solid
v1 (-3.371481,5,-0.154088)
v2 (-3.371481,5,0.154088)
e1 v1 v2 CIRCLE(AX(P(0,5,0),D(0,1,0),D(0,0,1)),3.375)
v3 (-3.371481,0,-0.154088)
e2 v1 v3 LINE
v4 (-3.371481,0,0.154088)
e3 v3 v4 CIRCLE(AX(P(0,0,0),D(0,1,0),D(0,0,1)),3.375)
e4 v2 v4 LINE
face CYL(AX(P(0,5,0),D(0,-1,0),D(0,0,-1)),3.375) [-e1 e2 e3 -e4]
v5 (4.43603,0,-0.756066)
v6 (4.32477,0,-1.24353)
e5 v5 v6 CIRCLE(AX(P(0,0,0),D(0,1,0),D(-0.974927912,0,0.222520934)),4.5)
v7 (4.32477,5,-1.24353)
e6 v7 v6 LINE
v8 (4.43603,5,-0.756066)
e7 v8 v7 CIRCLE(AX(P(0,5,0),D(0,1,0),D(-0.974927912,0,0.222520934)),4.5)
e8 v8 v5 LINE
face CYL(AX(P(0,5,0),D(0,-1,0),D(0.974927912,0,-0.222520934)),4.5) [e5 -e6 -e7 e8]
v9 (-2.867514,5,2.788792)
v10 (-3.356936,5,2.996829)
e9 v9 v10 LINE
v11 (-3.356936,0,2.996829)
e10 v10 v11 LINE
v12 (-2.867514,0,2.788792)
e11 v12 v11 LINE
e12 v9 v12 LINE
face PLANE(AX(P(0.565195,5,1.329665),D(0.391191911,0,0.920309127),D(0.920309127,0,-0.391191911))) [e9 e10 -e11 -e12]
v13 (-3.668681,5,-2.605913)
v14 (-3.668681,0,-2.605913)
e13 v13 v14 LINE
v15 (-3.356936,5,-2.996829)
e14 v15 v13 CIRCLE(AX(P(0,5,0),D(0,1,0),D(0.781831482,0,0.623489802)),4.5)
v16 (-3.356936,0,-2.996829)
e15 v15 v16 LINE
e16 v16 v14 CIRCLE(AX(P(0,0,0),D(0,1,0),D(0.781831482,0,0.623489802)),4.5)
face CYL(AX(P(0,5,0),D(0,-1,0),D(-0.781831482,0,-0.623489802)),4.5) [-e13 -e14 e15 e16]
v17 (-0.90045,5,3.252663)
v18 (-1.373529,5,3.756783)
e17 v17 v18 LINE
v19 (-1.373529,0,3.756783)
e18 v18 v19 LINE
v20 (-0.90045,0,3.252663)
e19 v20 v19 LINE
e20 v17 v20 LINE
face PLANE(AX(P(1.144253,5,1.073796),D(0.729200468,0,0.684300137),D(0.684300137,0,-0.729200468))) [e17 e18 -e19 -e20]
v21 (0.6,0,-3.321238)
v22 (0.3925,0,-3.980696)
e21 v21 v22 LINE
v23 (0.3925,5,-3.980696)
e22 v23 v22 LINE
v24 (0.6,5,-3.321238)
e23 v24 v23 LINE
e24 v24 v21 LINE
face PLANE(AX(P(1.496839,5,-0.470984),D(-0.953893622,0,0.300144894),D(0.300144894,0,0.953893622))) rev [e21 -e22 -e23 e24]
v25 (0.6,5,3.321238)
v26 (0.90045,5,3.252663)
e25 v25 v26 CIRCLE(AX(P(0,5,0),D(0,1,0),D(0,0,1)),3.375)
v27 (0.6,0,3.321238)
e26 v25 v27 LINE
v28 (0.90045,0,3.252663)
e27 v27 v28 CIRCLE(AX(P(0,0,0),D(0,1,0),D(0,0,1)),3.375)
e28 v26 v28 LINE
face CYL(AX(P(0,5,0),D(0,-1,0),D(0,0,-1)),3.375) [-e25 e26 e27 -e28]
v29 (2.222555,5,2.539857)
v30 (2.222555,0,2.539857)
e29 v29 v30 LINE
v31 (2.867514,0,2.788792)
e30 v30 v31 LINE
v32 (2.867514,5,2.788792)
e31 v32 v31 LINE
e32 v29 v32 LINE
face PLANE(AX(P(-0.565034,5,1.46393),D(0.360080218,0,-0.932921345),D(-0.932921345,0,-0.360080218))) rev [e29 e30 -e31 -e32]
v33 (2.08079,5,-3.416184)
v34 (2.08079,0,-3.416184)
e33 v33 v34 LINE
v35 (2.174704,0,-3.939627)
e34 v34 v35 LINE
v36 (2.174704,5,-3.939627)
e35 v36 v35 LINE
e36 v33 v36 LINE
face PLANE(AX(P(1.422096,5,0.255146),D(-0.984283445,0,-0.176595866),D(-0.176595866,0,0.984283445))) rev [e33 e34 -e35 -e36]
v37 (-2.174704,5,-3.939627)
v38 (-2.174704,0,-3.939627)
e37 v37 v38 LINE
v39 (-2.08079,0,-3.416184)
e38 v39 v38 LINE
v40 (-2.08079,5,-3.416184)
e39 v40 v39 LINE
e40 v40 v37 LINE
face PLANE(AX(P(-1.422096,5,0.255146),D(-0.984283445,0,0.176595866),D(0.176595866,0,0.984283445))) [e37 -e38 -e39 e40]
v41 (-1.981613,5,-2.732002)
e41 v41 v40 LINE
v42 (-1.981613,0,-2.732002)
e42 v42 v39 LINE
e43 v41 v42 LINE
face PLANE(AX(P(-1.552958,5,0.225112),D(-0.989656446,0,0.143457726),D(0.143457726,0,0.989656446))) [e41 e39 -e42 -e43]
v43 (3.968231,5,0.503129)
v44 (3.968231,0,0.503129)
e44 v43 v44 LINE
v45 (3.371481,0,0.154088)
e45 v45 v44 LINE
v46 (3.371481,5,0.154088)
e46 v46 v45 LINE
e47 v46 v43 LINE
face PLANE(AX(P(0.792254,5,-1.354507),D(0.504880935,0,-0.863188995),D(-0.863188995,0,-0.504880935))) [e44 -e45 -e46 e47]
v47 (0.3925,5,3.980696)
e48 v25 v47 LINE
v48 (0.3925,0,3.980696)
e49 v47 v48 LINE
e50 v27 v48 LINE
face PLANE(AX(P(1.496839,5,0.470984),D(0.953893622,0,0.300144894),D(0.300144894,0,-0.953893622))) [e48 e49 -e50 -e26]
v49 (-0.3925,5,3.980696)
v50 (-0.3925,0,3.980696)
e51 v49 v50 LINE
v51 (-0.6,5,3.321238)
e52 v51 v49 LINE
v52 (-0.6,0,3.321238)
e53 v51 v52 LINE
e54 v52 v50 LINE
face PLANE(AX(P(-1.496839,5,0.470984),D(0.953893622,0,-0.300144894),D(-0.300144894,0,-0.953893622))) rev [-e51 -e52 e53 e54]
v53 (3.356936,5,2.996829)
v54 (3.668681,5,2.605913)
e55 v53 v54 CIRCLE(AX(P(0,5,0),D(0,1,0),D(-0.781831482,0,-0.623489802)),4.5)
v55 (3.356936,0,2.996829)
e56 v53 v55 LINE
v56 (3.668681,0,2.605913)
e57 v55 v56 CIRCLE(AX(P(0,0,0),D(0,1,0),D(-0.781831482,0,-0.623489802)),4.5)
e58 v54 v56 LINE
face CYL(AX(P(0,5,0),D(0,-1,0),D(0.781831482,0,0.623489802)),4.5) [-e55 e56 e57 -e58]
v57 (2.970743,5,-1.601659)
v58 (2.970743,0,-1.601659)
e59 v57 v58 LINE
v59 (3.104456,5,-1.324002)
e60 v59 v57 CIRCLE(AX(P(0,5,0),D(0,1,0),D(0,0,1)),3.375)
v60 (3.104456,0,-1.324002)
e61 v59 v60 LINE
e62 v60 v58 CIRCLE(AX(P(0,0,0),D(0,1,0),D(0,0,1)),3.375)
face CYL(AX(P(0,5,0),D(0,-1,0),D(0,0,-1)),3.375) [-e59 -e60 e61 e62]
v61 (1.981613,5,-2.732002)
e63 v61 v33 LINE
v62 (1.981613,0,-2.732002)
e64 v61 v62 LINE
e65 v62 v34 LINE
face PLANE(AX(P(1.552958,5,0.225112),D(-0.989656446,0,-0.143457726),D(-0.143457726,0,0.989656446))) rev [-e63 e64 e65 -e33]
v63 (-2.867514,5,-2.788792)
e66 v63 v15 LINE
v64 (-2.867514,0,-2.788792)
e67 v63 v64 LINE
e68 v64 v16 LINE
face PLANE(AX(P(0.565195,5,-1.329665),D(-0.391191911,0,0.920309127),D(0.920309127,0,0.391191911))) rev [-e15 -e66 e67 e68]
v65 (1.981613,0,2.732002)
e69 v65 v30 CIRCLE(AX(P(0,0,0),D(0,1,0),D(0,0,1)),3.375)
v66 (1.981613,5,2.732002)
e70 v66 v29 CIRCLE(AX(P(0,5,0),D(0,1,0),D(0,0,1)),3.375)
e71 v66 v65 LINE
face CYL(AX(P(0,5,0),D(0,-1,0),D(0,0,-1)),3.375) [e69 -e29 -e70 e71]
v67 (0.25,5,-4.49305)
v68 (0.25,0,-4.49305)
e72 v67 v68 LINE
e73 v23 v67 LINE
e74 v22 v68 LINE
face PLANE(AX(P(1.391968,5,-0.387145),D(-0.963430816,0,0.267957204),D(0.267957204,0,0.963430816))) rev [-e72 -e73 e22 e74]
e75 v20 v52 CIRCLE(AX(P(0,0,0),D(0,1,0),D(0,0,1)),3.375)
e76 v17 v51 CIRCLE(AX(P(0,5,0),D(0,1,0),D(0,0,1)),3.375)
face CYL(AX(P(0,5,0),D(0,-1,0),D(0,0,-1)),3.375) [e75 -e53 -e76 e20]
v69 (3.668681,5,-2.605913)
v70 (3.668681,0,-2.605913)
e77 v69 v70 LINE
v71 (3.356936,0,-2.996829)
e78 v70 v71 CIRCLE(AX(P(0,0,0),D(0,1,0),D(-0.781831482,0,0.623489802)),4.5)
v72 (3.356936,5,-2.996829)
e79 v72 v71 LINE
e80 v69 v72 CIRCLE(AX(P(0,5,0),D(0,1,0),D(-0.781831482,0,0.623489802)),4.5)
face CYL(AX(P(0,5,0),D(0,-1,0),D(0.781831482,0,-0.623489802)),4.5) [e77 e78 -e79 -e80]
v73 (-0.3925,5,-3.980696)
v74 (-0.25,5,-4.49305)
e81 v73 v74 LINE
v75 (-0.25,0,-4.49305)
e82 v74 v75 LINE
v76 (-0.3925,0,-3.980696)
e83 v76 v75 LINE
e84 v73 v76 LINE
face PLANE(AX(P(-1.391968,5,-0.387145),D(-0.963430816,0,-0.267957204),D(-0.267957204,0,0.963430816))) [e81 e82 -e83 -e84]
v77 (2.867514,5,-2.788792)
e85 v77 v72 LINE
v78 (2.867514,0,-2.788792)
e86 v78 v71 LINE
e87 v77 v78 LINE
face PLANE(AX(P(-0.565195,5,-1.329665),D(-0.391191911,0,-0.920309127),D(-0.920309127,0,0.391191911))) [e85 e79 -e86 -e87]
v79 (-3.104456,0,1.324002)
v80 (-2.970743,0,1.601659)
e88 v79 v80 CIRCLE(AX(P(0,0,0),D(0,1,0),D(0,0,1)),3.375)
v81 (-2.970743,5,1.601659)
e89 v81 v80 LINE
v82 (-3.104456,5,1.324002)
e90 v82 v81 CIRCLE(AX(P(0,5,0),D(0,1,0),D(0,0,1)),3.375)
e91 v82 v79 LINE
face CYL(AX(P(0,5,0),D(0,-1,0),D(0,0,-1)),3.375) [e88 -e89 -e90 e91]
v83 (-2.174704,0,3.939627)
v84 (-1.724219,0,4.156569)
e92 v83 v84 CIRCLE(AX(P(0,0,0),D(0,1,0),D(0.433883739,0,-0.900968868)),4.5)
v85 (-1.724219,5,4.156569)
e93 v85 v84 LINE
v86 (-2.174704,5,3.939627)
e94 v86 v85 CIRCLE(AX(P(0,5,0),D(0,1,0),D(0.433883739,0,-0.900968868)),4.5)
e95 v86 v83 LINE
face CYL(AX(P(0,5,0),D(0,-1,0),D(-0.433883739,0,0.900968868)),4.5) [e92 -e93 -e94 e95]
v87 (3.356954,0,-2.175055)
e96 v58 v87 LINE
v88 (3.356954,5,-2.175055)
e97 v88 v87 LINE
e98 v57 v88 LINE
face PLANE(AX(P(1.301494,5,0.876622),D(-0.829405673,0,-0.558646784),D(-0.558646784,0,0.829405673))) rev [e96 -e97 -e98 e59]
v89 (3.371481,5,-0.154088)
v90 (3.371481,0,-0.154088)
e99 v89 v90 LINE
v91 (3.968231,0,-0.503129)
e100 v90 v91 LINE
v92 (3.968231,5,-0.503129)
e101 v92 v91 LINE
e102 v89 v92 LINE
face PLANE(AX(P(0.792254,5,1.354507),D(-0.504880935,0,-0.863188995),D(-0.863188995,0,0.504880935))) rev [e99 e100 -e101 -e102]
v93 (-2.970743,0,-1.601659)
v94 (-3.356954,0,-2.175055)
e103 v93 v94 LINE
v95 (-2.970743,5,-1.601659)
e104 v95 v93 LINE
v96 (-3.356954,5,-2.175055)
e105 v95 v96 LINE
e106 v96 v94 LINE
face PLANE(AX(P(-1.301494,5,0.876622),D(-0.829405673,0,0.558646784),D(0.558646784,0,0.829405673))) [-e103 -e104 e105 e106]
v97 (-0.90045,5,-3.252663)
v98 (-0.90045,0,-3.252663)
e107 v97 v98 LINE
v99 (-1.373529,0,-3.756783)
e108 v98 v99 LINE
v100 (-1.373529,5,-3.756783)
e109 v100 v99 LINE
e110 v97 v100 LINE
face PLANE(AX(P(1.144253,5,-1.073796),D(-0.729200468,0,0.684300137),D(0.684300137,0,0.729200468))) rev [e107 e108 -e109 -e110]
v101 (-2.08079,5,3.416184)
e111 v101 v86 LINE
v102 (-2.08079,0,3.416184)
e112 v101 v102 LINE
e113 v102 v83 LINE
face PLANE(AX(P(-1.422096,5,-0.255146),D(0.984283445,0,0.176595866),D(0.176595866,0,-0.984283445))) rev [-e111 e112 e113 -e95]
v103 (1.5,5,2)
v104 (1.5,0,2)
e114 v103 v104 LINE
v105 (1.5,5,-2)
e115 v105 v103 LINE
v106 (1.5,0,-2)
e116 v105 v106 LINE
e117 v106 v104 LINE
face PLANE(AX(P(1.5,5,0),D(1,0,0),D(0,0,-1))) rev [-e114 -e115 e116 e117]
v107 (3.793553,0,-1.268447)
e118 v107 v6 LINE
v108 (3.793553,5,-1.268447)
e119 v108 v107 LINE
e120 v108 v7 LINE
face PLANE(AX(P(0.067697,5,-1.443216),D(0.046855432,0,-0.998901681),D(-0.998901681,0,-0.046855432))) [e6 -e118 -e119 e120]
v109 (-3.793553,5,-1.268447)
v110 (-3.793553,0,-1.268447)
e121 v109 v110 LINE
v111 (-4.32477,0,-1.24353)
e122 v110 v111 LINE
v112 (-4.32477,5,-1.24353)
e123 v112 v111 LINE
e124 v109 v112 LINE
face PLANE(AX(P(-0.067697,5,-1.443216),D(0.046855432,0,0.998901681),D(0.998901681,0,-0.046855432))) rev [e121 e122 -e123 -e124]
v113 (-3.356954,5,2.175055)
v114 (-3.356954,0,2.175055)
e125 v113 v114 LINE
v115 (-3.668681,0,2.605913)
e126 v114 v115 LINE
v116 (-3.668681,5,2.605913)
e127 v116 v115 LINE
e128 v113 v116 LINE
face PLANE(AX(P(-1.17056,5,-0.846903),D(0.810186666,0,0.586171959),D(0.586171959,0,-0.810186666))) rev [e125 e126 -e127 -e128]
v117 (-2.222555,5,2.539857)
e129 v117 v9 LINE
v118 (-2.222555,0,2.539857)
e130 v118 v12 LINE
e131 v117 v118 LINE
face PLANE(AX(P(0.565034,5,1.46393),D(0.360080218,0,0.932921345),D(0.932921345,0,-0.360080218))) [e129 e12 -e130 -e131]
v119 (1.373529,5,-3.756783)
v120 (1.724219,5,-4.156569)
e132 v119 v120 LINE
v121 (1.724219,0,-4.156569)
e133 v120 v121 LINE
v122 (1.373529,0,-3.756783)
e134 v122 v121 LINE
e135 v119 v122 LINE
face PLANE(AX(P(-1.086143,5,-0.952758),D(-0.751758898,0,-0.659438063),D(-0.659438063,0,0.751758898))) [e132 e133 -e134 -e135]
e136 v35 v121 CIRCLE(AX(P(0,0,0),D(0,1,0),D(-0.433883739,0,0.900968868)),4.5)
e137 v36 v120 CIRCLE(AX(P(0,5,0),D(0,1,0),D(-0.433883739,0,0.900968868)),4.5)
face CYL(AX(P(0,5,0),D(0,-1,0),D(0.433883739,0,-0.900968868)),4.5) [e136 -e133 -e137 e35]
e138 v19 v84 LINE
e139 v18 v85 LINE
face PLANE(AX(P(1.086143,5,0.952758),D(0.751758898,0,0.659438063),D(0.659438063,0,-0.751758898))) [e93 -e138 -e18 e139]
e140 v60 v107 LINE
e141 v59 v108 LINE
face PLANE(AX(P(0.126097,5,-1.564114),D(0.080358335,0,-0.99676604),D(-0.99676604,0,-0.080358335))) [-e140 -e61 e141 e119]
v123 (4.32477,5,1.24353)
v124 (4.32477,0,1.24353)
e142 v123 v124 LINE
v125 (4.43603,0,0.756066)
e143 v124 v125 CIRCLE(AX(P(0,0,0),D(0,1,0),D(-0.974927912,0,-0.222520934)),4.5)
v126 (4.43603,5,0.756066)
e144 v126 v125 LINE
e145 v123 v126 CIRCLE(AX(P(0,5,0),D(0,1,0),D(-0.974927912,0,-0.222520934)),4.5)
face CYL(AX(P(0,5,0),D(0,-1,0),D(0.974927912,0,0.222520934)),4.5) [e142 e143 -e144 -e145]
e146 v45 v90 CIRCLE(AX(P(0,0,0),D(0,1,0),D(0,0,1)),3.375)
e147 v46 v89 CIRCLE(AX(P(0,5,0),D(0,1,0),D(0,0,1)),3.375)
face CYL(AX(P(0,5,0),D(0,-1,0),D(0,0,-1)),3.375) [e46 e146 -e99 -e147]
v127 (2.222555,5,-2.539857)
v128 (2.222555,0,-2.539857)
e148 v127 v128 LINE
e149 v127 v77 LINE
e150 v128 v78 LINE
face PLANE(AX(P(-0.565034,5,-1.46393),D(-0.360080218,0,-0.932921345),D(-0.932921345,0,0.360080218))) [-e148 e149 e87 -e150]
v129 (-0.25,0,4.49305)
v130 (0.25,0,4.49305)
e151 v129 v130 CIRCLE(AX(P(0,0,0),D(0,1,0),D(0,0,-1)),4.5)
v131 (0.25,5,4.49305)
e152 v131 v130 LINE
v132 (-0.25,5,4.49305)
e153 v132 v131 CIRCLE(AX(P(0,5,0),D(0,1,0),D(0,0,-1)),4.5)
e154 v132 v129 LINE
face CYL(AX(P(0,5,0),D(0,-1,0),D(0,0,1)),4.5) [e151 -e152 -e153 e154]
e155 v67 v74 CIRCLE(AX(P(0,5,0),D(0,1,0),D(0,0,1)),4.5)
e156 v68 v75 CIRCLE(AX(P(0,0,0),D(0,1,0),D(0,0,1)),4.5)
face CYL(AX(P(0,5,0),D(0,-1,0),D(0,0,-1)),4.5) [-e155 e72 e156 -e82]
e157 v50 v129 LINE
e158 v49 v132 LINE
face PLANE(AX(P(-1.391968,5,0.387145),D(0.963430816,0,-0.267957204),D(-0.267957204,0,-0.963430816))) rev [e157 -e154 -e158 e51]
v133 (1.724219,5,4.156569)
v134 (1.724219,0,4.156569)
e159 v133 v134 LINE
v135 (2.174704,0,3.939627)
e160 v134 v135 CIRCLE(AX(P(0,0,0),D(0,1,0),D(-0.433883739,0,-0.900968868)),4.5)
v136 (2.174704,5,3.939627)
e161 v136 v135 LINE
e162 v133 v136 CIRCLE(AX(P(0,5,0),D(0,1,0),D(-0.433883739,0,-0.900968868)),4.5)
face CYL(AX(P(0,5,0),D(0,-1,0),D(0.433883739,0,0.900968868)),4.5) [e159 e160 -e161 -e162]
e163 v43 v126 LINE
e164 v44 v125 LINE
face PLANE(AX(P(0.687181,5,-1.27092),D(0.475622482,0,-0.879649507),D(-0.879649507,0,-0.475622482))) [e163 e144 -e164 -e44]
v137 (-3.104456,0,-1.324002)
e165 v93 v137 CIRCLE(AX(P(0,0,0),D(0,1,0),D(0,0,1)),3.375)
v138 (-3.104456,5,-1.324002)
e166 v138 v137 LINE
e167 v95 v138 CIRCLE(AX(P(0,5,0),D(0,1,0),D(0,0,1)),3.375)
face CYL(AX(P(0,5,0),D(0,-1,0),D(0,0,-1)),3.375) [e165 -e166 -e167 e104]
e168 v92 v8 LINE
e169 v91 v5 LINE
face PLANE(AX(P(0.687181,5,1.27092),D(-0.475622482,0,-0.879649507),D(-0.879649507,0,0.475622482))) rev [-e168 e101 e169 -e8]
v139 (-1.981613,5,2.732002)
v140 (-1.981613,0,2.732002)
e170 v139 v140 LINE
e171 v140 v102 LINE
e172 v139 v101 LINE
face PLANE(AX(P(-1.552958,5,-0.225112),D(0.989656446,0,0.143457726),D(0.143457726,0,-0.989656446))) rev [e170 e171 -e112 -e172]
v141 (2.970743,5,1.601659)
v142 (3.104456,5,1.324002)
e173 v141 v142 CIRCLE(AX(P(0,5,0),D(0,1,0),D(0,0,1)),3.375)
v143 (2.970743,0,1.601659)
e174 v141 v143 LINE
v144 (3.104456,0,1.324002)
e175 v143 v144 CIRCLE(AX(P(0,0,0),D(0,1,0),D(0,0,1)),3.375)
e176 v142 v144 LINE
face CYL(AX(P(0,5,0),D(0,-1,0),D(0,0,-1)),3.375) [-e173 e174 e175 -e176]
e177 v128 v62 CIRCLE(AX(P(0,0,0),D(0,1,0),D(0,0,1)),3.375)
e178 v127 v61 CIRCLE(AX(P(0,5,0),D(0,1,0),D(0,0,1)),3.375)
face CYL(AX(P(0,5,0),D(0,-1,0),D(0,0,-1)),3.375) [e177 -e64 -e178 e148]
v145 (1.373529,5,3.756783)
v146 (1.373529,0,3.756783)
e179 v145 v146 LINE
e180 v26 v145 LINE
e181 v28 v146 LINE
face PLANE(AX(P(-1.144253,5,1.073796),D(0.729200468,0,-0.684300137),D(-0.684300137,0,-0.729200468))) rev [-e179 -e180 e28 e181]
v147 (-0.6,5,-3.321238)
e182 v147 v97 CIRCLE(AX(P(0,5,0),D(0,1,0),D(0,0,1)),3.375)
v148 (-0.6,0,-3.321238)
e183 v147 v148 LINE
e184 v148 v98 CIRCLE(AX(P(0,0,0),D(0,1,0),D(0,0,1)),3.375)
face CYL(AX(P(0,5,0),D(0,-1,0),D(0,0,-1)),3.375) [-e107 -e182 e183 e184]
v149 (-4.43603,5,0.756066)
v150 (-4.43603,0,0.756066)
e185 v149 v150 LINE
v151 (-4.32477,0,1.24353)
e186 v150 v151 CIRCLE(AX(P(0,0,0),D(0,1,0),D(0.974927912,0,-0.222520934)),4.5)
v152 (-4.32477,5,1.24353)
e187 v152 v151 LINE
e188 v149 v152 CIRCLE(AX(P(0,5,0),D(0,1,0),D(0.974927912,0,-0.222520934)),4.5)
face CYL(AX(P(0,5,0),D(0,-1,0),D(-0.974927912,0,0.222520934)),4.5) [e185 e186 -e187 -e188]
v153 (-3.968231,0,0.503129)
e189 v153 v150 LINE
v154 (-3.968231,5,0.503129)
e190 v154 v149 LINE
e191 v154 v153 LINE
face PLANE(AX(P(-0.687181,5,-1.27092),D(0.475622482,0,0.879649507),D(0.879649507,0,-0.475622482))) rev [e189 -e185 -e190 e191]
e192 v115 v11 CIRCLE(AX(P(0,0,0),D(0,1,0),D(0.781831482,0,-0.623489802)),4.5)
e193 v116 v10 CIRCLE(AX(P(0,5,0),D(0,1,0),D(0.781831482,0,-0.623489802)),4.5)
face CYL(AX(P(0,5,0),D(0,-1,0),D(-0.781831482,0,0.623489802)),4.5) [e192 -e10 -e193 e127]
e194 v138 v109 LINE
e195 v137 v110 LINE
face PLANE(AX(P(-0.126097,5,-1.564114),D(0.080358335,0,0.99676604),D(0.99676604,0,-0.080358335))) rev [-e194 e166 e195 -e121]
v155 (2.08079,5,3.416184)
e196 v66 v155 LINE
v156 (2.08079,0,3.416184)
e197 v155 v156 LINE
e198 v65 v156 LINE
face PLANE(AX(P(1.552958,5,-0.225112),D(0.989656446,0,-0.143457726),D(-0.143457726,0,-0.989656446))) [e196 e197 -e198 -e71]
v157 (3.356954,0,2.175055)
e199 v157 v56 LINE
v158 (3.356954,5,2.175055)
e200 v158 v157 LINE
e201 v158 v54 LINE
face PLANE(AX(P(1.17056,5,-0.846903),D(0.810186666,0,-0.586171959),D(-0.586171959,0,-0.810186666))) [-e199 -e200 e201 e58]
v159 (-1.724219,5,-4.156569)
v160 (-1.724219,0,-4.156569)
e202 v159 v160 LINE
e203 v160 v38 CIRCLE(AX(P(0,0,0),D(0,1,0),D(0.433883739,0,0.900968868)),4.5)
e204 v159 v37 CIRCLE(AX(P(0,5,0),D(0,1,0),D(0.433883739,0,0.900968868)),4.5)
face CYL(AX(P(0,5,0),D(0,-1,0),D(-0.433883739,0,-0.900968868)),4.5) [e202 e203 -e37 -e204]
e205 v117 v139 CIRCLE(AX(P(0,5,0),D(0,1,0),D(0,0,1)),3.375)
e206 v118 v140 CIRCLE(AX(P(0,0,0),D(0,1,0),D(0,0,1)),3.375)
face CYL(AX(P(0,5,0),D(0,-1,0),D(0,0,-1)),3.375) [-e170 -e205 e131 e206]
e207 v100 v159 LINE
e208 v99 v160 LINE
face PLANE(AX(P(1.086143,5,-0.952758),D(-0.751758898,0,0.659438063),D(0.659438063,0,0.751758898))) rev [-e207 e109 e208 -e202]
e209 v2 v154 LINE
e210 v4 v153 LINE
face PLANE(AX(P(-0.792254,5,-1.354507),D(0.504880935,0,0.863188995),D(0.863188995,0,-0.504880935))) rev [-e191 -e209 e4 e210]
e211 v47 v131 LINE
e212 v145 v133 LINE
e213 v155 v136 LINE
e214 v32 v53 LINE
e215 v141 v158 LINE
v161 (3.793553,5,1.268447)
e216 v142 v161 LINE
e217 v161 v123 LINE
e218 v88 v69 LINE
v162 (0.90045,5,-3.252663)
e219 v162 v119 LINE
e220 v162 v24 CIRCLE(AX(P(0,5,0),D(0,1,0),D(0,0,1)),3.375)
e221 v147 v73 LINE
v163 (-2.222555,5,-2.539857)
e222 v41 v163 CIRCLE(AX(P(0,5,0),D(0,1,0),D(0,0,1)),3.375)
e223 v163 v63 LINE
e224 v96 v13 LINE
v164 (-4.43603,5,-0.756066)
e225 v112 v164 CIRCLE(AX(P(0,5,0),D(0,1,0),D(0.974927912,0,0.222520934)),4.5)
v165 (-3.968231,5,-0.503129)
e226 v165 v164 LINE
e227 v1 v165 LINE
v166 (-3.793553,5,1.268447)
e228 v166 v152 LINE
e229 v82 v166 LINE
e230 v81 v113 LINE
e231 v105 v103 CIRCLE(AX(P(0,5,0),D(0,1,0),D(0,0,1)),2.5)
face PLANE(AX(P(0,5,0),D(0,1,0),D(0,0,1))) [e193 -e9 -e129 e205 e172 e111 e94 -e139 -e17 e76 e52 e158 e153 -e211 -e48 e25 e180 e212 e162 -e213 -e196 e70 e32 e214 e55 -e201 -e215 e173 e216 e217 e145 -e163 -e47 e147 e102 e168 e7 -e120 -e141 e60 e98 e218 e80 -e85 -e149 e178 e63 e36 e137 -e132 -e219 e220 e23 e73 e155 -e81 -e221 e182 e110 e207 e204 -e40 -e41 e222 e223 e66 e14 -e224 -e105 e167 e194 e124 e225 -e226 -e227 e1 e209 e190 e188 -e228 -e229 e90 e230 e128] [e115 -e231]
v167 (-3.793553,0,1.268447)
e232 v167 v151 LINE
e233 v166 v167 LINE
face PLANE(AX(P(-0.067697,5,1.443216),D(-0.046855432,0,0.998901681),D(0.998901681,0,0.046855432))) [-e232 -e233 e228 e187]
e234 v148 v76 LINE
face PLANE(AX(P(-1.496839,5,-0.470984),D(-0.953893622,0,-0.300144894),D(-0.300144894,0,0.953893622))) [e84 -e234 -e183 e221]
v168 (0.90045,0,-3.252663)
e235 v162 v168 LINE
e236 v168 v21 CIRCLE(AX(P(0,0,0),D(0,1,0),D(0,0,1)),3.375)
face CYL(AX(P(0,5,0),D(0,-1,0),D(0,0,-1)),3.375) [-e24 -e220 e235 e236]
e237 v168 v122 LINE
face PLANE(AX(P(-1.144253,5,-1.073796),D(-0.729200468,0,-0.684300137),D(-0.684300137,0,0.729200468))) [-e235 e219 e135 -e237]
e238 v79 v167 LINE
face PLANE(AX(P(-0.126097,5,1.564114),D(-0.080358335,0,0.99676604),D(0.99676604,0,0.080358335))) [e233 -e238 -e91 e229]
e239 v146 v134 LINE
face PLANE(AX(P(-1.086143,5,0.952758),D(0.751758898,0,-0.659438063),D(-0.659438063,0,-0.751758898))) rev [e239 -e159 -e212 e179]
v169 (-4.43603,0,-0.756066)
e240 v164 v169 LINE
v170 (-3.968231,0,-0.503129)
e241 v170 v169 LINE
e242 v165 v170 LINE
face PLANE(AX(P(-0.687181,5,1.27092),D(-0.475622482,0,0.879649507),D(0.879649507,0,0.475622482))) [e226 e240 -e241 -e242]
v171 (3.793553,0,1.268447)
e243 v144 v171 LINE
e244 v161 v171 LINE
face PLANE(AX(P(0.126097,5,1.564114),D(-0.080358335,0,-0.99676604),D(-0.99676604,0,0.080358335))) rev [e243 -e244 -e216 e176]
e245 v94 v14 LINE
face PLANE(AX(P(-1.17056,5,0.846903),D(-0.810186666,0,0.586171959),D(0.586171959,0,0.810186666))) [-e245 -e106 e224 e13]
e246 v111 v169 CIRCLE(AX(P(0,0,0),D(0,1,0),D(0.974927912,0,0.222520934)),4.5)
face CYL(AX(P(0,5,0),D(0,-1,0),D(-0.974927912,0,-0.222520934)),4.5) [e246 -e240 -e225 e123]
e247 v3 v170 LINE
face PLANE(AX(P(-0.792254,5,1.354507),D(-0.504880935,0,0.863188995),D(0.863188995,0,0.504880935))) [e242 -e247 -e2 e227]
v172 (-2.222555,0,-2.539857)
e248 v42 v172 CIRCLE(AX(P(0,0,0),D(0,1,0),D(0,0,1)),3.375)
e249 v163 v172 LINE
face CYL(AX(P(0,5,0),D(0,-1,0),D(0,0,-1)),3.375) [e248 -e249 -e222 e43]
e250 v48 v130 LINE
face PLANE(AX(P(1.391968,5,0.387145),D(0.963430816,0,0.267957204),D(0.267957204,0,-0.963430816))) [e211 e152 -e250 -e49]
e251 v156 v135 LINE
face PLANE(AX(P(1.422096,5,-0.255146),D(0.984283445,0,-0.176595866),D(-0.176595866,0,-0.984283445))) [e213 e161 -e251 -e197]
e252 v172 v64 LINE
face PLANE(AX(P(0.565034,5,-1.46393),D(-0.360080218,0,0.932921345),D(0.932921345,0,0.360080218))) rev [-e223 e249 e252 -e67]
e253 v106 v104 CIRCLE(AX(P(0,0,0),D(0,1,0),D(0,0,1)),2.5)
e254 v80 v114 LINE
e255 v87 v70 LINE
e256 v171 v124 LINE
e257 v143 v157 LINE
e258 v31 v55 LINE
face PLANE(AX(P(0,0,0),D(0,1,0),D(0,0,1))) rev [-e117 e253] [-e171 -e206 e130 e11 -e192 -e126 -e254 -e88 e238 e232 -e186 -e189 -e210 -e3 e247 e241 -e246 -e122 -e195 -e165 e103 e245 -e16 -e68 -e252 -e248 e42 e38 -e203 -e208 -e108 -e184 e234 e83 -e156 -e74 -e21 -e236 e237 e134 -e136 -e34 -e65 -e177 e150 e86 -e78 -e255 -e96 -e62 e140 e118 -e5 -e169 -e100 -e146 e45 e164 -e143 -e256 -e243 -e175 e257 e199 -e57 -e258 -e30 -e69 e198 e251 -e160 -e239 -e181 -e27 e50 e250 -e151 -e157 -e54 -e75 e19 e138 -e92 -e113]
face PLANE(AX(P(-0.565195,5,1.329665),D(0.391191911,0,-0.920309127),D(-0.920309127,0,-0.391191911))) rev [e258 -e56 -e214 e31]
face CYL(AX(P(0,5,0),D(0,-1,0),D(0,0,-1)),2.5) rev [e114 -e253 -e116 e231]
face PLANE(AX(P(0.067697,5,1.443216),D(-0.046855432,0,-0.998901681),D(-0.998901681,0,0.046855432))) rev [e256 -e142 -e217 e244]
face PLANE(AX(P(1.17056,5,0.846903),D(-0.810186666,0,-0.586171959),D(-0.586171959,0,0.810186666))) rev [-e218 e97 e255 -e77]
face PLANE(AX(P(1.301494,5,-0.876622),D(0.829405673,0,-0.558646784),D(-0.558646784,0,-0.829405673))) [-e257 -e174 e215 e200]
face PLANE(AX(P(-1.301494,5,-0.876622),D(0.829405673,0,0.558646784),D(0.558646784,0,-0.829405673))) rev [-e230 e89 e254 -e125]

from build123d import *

# Parameters (mm, degrees)
BOSS_EXTRUDE1_DEPTH = 5
CIRPATTERN1_DEPTH   = 5


# Read off the part's stored shape, not the designer's step: CirPattern1
with BuildPart() as part:
    # Sketch2 → Boss-Extrude1 (new body)
    with BuildSketch(Plane(origin=(0, 0, 0), x_dir=(1, 0, 0), z_dir=(0, 1, 0))):
        with BuildLine():
            Line((-0.3925, 3.98069639), (-0.6, 3.321238474))
            ThreePointArc((-0.6, 3.321238474), (0, -3.375), (0.6, 3.321238474))
            Line((0.6, 3.321238474), (0.3925, 3.98069639))
            Line((0.3925, 3.98069639), (0.25, 4.493050189))
            ThreePointArc((0.25, 4.493050189), (0, 4.5), (-0.25, 4.493050189))
            Line((-0.25, 4.493050189), (-0.3925, 3.98069639))
        make_face()
        with BuildLine():
            Line((1.5, 2), (1.5, -2))
            ThreePointArc((1.5, -2), (-2.5, 0), (1.5, 2))
        make_face(mode=Mode.SUBTRACT)
    extrude(amount=BOSS_EXTRUDE1_DEPTH)

    # CirPattern1 outline → CirPattern1 (add)
    with BuildSketch(Plane(origin=(0, 0, 0), x_dir=(1, 0, 0), z_dir=(0, 1, 0))):
        with BuildLine():
            Line((1.724219199, 4.156569277), (1.373529153, 3.756782888))
            Line((1.373529153, 3.756782888), (0.900450047, 3.252662711))
            ThreePointArc((0.900450047, 3.252662711), (1.46435762, 3.040769929), (1.981612688, 2.732002224))
            Line((1.981612688, 2.732002224), (2.080789715, 3.416184152))
            Line((2.080789715, 3.416184152), (2.174703633, 3.939627407))
            ThreePointArc((2.174703633, 3.939627407), (1.952476826, 4.054359906), (1.724219199, 4.156569277))
        make_face()
        with BuildLine():
            Line((-2.080789715, 3.416184152), (-1.981612688, 2.732002224))
            ThreePointArc((-1.981612688, 2.732002224), (-1.46435762, 3.040769929), (-0.900450047, 3.252662711))
            Line((-0.900450047, 3.252662711), (-1.373529153, 3.756782888))
            Line((-1.373529153, 3.756782888), (-1.724219199, 4.156569277))
            ThreePointArc((-1.724219199, 4.156569277), (-1.952476826, 4.054359906), (-2.174703633, 3.939627407))
            Line((-2.174703633, 3.939627407), (-2.080789715, 3.416184152))
        make_face()
        with BuildLine():
            Line((-3.356953507, 2.175054747), (-2.970742681, 1.601659428))
            ThreePointArc((-2.970742681, 1.601659428), (-2.638681254, 2.104278081), (-2.222554919, 2.539857207))
            Line((-2.222554919, 2.539857207), (-2.867514013, 2.78879246))
            Line((-2.867514013, 2.78879246), (-3.35693564, 2.996828843))
            ThreePointArc((-3.35693564, 2.996828843), (-3.518241671, 2.805704108), (-3.66868054, 2.605913101))
            Line((-3.66868054, 2.605913101), (-3.356953507, 2.175054747))
        make_face()
        with BuildLine():
            Line((-3.968231487, 0.503129073), (-3.371480652, 0.15408834))
            ThreePointArc((-3.371480652, 0.15408834), (-3.290381704, 0.751008152), (-3.104455531, 1.324001834))
            Line((-3.104455531, 1.324001834), (-3.793552554, 1.268447484))
            Line((-3.793552554, 1.268447484), (-4.324769807, 1.243529702))
            ThreePointArc((-4.324769807, 1.243529702), (-4.387175605, 1.001344203), (-4.436030273, 0.756065746))
            Line((-4.436030273, 0.756065746), (-3.968231487, 0.503129073))
        make_face()
        with BuildLine():
            Line((-3.793552554, -1.268447484), (-3.104455531, -1.324001834))
            ThreePointArc((-3.104455531, -1.324001834), (-3.290381704, -0.751008152), (-3.371480652, -0.15408834))
            Line((-3.371480652, -0.15408834), (-3.968231487, -0.503129073))
            Line((-3.968231487, -0.503129073), (-4.436030273, -0.756065746))
            ThreePointArc((-4.436030273, -0.756065746), (-4.387175605, -1.001344203), (-4.324769807, -1.243529702))
            Line((-4.324769807, -1.243529702), (-3.793552554, -1.268447484))
        make_face()
        with BuildLine():
            Line((-2.867514013, -2.78879246), (-2.222554919, -2.539857207))
            ThreePointArc((-2.222554919, -2.539857207), (-2.638681254, -2.104278081), (-2.970742681, -1.601659428))
            Line((-2.970742681, -1.601659428), (-3.356953507, -2.175054747))
            Line((-3.356953507, -2.175054747), (-3.66868054, -2.605913101))
            ThreePointArc((-3.66868054, -2.605913101), (-3.518241671, -2.805704108), (-3.35693564, -2.996828843))
            Line((-3.35693564, -2.996828843), (-2.867514013, -2.78879246))
        make_face()
        with BuildLine():
            Line((-1.373529153, -3.756782888), (-0.900450047, -3.252662711))
            ThreePointArc((-0.900450047, -3.252662711), (-1.46435762, -3.040769929), (-1.981612688, -2.732002224))
            Line((-1.981612688, -2.732002224), (-2.080789715, -3.416184152))
            Line((-2.080789715, -3.416184152), (-2.174703633, -3.939627407))
            ThreePointArc((-2.174703633, -3.939627407), (-1.952476826, -4.054359906), (-1.724219199, -4.156569277))
            Line((-1.724219199, -4.156569277), (-1.373529153, -3.756782888))
        make_face()
        with BuildLine():
            Line((0.3925, -3.98069639), (0.6, -3.321238474))
            ThreePointArc((0.6, -3.321238474), (0, -3.375), (-0.6, -3.321238474))
            Line((-0.6, -3.321238474), (-0.3925, -3.98069639))
            Line((-0.3925, -3.98069639), (-0.25, -4.493050189))
            ThreePointArc((-0.25, -4.493050189), (0, -4.5), (0.25, -4.493050189))
            Line((0.25, -4.493050189), (0.3925, -3.98069639))
        make_face()
        with BuildLine():
            Line((2.080789715, -3.416184152), (1.981612688, -2.732002224))
            ThreePointArc((1.981612688, -2.732002224), (1.46435762, -3.040769929), (0.900450047, -3.252662711))
            Line((0.900450047, -3.252662711), (1.373529153, -3.756782888))
            Line((1.373529153, -3.756782888), (1.724219199, -4.156569277))
            ThreePointArc((1.724219199, -4.156569277), (1.952476826, -4.054359906), (2.174703633, -3.939627407))
            Line((2.174703633, -3.939627407), (2.080789715, -3.416184152))
        make_face()
        with BuildLine():
            Line((3.356953507, -2.175054747), (2.970742681, -1.601659428))
            ThreePointArc((2.970742681, -1.601659428), (2.638681254, -2.104278081), (2.222554919, -2.539857207))
            Line((2.222554919, -2.539857207), (2.867514013, -2.78879246))
            Line((2.867514013, -2.78879246), (3.35693564, -2.996828843))
            ThreePointArc((3.35693564, -2.996828843), (3.518241671, -2.805704108), (3.66868054, -2.605913101))
            Line((3.66868054, -2.605913101), (3.356953507, -2.175054747))
        make_face()
        with BuildLine():
            Line((3.968231487, -0.503129073), (3.371480652, -0.15408834))
            ThreePointArc((3.371480652, -0.15408834), (3.290381704, -0.751008152), (3.104455531, -1.324001834))
            Line((3.104455531, -1.324001834), (3.793552554, -1.268447484))
            Line((3.793552554, -1.268447484), (4.324769807, -1.243529702))
            ThreePointArc((4.324769807, -1.243529702), (4.387175605, -1.001344203), (4.436030273, -0.756065746))
            Line((4.436030273, -0.756065746), (3.968231487, -0.503129073))
        make_face()
        with BuildLine():
            Line((3.793552554, 1.268447484), (3.104455531, 1.324001834))
            ThreePointArc((3.104455531, 1.324001834), (3.290381704, 0.751008152), (3.371480652, 0.15408834))
            Line((3.371480652, 0.15408834), (3.968231487, 0.503129073))
            Line((3.968231487, 0.503129073), (4.436030273, 0.756065746))
            ThreePointArc((4.436030273, 0.756065746), (4.387175605, 1.001344203), (4.324769807, 1.243529702))
            Line((4.324769807, 1.243529702), (3.793552554, 1.268447484))
        make_face()
        with BuildLine():
            Line((2.867514013, 2.78879246), (2.222554919, 2.539857207))
            ThreePointArc((2.222554919, 2.539857207), (2.638681254, 2.104278081), (2.970742681, 1.601659428))
            Line((2.970742681, 1.601659428), (3.356953507, 2.175054747))
            Line((3.356953507, 2.175054747), (3.66868054, 2.605913101))
            ThreePointArc((3.66868054, 2.605913101), (3.518241671, 2.805704108), (3.35693564, 2.996828843))
            Line((3.35693564, 2.996828843), (2.867514013, 2.78879246))
        make_face()
    extrude(amount=CIRPATTERN1_DEPTH)


solid = part.part
